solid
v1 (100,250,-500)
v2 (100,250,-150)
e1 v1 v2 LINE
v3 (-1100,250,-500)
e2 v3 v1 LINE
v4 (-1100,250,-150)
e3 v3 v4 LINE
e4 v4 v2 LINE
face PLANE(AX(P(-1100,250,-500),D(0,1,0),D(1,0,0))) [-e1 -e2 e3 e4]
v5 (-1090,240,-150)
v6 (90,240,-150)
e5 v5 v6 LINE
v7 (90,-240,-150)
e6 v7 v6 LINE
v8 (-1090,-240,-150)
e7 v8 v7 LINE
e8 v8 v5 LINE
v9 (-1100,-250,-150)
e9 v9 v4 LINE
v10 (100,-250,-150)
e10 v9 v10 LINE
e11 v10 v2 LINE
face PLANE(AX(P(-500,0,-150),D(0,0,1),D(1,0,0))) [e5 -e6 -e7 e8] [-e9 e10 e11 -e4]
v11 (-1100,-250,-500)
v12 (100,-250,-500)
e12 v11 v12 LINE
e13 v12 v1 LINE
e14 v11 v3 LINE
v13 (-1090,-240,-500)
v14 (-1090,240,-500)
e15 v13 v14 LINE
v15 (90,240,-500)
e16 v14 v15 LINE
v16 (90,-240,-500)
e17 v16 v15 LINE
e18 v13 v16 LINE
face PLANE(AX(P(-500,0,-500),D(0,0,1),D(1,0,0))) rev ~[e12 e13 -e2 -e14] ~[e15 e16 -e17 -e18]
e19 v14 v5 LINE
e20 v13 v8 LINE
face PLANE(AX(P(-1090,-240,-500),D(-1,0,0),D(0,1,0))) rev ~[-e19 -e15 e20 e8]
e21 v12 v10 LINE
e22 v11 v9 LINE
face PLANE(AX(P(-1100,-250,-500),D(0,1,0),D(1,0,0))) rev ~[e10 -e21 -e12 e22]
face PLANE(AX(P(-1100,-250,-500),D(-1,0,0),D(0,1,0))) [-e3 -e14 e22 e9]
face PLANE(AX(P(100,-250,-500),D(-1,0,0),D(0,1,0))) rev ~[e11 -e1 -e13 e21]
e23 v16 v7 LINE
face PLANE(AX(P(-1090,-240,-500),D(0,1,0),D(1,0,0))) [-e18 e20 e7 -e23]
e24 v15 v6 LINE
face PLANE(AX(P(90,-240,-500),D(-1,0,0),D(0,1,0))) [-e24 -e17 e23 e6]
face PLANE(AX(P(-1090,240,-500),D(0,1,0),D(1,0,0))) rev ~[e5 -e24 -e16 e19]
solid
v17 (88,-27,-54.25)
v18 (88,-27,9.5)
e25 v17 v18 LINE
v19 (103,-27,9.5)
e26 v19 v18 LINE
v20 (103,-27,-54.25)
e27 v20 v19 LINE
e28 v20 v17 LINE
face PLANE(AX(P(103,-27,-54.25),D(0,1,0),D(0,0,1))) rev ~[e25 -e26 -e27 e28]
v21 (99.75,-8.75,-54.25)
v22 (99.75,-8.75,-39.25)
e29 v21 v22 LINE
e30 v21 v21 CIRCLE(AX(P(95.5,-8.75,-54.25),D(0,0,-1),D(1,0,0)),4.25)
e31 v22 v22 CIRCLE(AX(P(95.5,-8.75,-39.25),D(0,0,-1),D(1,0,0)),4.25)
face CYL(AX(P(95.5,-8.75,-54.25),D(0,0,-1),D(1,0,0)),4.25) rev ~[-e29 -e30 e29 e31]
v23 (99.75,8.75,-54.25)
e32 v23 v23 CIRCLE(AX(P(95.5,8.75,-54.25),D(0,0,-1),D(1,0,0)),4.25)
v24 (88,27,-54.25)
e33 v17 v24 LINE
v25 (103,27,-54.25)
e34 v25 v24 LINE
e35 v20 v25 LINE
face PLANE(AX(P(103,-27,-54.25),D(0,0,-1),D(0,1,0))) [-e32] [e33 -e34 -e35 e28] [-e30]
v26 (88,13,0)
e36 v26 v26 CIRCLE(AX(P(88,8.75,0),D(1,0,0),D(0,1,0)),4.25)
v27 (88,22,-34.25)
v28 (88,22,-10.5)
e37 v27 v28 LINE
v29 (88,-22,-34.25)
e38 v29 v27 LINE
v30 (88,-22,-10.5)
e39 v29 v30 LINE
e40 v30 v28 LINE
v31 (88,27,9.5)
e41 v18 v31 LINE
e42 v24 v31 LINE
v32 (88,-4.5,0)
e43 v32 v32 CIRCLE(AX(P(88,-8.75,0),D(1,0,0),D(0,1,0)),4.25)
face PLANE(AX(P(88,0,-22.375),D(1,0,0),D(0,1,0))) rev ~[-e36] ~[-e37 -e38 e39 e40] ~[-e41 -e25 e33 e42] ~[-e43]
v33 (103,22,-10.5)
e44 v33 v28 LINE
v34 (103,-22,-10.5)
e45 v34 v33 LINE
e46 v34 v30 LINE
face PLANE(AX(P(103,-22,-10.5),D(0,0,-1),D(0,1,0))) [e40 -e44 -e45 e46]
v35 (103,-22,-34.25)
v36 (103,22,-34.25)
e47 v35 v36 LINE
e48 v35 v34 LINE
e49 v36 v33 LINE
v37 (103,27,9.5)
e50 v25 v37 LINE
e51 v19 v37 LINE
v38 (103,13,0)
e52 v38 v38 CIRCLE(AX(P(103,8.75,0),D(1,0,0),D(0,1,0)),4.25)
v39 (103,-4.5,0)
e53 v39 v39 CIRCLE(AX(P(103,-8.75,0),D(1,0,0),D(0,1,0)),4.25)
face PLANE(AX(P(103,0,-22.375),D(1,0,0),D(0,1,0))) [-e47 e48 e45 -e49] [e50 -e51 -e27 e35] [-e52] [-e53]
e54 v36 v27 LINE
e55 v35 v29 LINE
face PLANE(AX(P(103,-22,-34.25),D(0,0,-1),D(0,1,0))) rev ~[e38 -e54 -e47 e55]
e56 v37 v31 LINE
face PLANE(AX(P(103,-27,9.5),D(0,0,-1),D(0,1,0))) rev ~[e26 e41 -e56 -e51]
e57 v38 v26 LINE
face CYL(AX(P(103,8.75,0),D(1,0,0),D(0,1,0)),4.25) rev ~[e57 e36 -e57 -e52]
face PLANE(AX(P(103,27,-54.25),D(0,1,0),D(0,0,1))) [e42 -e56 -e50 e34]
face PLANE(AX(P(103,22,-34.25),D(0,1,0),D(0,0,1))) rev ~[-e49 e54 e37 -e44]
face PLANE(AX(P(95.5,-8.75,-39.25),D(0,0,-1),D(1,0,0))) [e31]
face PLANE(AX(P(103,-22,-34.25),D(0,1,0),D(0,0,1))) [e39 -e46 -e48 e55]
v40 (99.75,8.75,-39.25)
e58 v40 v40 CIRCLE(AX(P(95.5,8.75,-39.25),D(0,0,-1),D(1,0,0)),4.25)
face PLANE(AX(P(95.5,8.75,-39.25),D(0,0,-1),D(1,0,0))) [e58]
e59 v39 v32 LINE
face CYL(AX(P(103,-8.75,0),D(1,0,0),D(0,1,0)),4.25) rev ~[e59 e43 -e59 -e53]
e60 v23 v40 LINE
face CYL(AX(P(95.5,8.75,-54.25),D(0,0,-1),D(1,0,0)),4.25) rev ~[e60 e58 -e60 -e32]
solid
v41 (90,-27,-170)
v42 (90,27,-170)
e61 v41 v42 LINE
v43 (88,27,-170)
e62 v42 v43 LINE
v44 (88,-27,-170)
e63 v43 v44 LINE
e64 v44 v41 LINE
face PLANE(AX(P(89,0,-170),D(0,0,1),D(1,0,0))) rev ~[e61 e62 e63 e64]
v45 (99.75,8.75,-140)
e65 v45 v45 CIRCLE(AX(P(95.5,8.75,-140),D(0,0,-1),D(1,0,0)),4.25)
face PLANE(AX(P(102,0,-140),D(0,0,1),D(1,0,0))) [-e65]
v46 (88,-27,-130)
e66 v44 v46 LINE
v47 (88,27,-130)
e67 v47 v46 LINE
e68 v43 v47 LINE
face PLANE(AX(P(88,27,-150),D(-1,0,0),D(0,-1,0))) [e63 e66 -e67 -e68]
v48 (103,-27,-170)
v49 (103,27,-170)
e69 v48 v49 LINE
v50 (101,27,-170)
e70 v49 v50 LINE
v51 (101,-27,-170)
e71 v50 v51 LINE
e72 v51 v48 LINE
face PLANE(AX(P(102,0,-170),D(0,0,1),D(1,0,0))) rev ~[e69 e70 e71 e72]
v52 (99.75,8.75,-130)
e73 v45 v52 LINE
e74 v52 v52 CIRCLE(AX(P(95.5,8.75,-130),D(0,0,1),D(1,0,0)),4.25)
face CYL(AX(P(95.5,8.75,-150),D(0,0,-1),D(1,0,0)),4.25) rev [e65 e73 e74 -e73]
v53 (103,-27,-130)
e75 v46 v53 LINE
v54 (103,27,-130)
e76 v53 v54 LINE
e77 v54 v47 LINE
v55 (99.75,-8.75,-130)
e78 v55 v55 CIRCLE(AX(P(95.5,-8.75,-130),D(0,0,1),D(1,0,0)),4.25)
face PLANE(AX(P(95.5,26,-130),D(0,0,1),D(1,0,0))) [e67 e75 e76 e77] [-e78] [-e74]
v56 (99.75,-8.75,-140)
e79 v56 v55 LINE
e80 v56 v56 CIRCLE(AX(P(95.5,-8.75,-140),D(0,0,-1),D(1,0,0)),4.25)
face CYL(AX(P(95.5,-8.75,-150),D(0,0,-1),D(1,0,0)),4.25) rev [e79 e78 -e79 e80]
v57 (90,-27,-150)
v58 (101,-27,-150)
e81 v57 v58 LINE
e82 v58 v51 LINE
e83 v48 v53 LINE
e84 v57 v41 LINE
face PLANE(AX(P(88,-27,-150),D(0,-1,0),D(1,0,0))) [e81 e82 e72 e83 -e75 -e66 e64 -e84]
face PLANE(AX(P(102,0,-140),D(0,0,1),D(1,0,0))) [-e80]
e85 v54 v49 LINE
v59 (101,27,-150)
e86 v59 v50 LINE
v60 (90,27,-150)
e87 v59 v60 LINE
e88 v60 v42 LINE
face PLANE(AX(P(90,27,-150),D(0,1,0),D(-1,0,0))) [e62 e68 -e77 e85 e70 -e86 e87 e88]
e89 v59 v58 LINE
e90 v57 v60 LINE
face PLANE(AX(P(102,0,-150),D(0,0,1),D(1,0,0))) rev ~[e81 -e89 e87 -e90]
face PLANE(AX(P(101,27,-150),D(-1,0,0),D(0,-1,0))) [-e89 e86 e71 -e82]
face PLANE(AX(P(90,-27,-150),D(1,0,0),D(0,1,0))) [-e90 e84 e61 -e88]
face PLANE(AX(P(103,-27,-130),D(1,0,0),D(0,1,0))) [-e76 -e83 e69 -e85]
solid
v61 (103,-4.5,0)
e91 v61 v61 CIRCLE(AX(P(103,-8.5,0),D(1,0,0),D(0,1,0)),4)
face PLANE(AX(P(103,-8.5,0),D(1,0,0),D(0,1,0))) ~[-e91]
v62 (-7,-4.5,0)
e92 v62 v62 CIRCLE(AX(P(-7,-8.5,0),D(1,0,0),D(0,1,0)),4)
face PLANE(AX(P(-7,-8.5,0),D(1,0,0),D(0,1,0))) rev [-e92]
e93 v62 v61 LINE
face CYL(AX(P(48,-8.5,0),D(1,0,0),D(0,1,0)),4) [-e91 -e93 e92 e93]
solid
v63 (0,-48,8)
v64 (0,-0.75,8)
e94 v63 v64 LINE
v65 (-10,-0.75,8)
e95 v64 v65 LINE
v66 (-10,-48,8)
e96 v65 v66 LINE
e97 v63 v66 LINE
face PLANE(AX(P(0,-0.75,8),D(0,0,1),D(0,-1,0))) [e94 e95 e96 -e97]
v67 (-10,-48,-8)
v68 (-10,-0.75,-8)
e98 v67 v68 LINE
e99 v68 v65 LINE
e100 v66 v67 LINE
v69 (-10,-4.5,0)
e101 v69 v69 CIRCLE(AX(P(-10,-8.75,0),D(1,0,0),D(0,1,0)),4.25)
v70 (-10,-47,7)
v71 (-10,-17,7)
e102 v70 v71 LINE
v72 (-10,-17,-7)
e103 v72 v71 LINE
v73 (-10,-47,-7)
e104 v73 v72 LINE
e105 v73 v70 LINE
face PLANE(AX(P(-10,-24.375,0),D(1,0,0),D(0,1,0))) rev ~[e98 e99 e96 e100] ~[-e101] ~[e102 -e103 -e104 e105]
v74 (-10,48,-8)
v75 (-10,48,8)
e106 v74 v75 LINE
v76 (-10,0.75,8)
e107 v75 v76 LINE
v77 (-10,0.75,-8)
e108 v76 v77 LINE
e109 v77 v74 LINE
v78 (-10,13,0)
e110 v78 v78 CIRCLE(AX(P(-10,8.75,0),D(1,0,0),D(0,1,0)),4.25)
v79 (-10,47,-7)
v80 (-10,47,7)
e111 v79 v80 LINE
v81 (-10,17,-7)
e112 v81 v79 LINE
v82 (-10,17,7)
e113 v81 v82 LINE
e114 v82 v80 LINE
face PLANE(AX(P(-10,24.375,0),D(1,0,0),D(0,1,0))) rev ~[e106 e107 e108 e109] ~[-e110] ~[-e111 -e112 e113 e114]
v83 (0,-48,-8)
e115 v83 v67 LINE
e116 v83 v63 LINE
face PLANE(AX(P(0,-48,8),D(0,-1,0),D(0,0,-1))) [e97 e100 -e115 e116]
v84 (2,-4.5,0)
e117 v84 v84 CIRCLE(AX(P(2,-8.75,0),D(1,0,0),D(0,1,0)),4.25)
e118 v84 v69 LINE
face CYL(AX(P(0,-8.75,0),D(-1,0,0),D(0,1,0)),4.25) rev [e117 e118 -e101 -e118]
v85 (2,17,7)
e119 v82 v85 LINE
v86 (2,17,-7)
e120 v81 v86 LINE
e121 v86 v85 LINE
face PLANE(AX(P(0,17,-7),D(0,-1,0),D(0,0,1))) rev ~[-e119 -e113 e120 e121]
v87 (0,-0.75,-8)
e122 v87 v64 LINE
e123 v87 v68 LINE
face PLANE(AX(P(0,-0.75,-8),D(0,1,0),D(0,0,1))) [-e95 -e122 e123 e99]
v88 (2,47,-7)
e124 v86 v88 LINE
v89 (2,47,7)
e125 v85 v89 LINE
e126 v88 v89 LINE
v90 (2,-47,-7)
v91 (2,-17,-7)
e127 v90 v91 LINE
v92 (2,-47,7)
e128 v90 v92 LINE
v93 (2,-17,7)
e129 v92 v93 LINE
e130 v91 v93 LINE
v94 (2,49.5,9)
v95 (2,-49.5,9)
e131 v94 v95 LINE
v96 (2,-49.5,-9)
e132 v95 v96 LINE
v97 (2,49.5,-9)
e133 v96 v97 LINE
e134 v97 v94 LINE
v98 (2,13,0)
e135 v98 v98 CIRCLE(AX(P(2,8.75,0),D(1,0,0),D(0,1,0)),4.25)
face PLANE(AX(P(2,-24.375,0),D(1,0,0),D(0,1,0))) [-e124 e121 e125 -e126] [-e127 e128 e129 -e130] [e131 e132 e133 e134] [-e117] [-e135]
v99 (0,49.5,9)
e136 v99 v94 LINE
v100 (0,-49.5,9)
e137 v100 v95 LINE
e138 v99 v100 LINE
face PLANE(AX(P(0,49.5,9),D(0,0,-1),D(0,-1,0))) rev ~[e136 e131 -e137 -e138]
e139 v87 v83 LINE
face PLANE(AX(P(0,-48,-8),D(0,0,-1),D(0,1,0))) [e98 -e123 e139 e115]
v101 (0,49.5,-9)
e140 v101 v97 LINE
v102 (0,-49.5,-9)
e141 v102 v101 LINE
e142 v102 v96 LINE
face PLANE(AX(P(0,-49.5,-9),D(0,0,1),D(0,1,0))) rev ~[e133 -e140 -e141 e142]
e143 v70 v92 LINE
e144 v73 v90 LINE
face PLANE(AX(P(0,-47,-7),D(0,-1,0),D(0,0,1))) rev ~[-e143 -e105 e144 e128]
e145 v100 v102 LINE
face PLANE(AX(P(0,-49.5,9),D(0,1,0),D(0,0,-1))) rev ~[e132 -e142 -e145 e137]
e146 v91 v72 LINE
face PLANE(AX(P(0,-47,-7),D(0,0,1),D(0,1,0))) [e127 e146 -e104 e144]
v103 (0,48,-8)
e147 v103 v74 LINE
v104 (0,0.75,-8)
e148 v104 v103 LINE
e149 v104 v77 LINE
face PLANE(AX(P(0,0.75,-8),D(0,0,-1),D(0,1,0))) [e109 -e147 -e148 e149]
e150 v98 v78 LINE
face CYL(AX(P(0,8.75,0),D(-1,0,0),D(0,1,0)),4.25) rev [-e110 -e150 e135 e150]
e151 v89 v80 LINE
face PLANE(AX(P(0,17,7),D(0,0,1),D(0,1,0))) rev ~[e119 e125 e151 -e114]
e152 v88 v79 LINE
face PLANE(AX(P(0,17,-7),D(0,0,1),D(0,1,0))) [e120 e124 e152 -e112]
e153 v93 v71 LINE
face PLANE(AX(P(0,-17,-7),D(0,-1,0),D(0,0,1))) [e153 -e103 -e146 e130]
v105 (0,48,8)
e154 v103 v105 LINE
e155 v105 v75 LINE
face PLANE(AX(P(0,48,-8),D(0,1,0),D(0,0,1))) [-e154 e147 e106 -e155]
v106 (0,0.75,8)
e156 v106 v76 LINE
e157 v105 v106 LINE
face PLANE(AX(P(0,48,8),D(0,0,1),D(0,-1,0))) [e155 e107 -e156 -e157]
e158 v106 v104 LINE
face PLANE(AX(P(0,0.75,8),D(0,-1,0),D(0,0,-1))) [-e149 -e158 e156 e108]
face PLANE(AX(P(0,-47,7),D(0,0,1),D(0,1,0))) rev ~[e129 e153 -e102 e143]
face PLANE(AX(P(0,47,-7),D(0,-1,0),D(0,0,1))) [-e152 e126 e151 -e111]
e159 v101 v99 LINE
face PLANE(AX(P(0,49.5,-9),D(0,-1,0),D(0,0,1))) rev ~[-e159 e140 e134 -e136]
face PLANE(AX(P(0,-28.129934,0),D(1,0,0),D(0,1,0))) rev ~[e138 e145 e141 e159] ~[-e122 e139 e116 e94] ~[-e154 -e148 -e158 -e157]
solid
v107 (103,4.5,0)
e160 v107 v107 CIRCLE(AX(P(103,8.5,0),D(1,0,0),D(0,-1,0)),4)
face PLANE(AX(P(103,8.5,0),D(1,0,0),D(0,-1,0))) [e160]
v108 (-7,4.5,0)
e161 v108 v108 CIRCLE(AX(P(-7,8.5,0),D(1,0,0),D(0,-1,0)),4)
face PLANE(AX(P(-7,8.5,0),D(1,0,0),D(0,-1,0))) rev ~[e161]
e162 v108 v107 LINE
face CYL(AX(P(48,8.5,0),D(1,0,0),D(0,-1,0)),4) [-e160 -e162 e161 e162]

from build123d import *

# Parameters (mm, degrees)
F0_W          = 1.5
F0_H          = 1
F0_H_2        = 16
F0_R          = 4.25
F0_W_2        = 30
F0_H_3        = 14
F1_DEPTH      = 2
F2_DEPTH      = 10
F2_DEPTH_BACK = 2
F5_W          = 1200
F5_H          = 500
F5_W_2        = 1180
F5_H_2        = 480
F6_DEPTH      = 350
F8_W          = 10
F8_H          = 2
F8_W_2        = 1
F8_H_2        = 50
F8_R          = 4.25
F9_DEPTH      = 10
F8_W_3        = 11
F10_DEPTH     = 20
F12_DEPTH     = 15
F13_DEPTH     = 20
F14_W         = 54
F14_H         = 63.75
F14_R         = 4.25
F14_W_2       = 44
F14_H_2       = 23.75
F15_DEPTH     = 15
F16_W         = 110
F16_H         = 4
F19_R         = 4.25
F20_DEPTH     = 15


# Not quite as in the source:
# - a feature names something its author has since deleted; it is built from what else it names
# - the program builds the solid bodies; features that only make, move or delete a surface that nothing else refers to are left out


with BuildPart() as f1:
    # F0 (on Right) → F1 (new body)
    with BuildSketch(Plane.YZ):
        Polygon((-0.75, 9), (-49.5, 9), (-49.5, -9), (-0.75, -9), (-0.75, -8), (-13, -8), (-16, -8), (-48, -8), (-48, 8), (-16, 8), (-13, 8), (-0.75, 8), align=None)
        with Locations((0, 8.5)):
            Rectangle(F0_W, F0_H)
        Polygon((49.5, 9), (0.75, 9), (0.75, 8), (13, 8), (16, 8), (48, 8), (48, -8), (16, -8), (13, -8), (0.75, -8), (0.75, -9), (49.5, -9), align=None)
        with Locations((0, -8.5)):
            Rectangle(F0_W, F0_H)
        Rectangle(F0_W, F0_H_2)
        Polygon((13, 8), (0.75, 8), (0.75, -8), (13, -8), (16, -8), (48, -8), (48, 8), (16, 8), align=None)
        with Locations((8.75, 0)):
            Circle(F0_R, mode=Mode.SUBTRACT)
        with Locations((32, 0)):
            Rectangle(F0_W_2, F0_H_3, mode=Mode.SUBTRACT)
    extrude(amount=F1_DEPTH)

    # F0 (on Right) → F2 (join, two sides)
    with BuildSketch(Plane.YZ) as f2_sk:
        Polygon((-0.75, -8), (-0.75, 8), (-13, 8), (-16, 8), (-48, 8), (-48, -8), (-16, -8), (-13, -8), align=None)
        with Locations((-32, 0)):
            Rectangle(F0_W_2, F0_H_3, mode=Mode.SUBTRACT)
        with Locations((-8.75, 0)):
            Circle(F0_R, mode=Mode.SUBTRACT)
        Polygon((13, 8), (0.75, 8), (0.75, -8), (13, -8), (16, -8), (48, -8), (48, 8), (16, 8), align=None)
        with Locations((8.75, 0)):
            Circle(F0_R, mode=Mode.SUBTRACT)
        with Locations((32, 0)):
            Rectangle(F0_W_2, F0_H_3, mode=Mode.SUBTRACT)
    extrude(amount=-F2_DEPTH)
    extrude(f2_sk.sketch, amount=F2_DEPTH_BACK)


with BuildPart() as f6:
    # F5 (on offset) → F6 (new body)
    with BuildSketch(Plane.XY.offset(-500)):
        with Locations((-500, 0)):
            Rectangle(F5_W, F5_H)
        with Locations((-500, 0)):
            Rectangle(F5_W_2, F5_H_2, mode=Mode.SUBTRACT)
    extrude(amount=F6_DEPTH)


with BuildPart() as f9:
    # F8 (on face) → F9 (new body)
    with BuildSketch(Plane.XY.offset(-150)):
        Polygon((101, 27), (101, 25), (101, -25), (101, -27), (103, -27), (103, 27), align=None)
        Polygon((90, -25), (90, 25), (90, 27), (88, 27), (88, -27), (90, -27), align=None)
        with Locations((95, 26)):
            Rectangle(F8_W, F8_H)
        with Locations((100.5, 26)):
            Rectangle(F8_W_2, F8_H)
        with Locations((100.5, -26)):
            Rectangle(F8_W_2, F8_H)
        with Locations((95, -26)):
            Rectangle(F8_W, F8_H)
        with Locations((100.5, 0)):
            Rectangle(F8_W_2, F8_H_2)
        with Locations((95, 0)):
            Rectangle(F8_W, F8_H_2)
        with Locations((95.5, -8.75)):
            Circle(F8_R, mode=Mode.SUBTRACT)
        with Locations((95.5, 8.75)):
            Circle(F8_R, mode=Mode.SUBTRACT)
        with Locations((95.5, 8.75)):
            Circle(F8_R)
        with Locations((95.5, -8.75)):
            Circle(F8_R)
    extrude(amount=F9_DEPTH)

    # F8 (on face) → F10 (join)
    with BuildSketch(Plane.XY.offset(-150)):
        with Locations((95.5, 26)):
            Rectangle(F8_W_3, F8_H)
        Polygon((90, -25), (90, 25), (90, 27), (88, 27), (88, -27), (90, -27), align=None)
        Polygon((101, 27), (101, 25), (101, -25), (101, -27), (103, -27), (103, 27), align=None)
        with Locations((95.5, -26)):
            Rectangle(F8_W_3, F8_H)
        with Locations((95, 0)):
            Rectangle(F8_W, F8_H_2)
        with Locations((95.5, -8.75)):
            Circle(F8_R, mode=Mode.SUBTRACT)
        with Locations((95.5, 8.75)):
            Circle(F8_R, mode=Mode.SUBTRACT)
        with Locations((100.5, 0)):
            Rectangle(F8_W_2, F8_H_2)
    extrude(amount=F10_DEPTH)

    # F12 (add): a face of the model
    f12_faces = [f9.faces().sort_by_distance(p)[0] for p in [
        (95.5, 0, -130),
    ]]
    extrude(f12_faces, amount=-F12_DEPTH)

    # F8 (on face) → F13 (join)
    with BuildSketch(Plane.XY.offset(-150)):
        Polygon((90, -25), (90, 25), (90, 27), (88, 27), (88, -27), (90, -27), align=None)
        Polygon((101, 27), (101, 25), (101, -25), (101, -27), (103, -27), (103, 27), align=None)
    extrude(amount=-F13_DEPTH)


with BuildPart() as f15:
    # F14 (on face) → F15 (new body)
    with BuildSketch(Plane.YZ.offset(103)):
        with Locations((0, -22.375)):
            Rectangle(F14_W, F14_H)
        with Locations((-8.75, 0)):
            Circle(F14_R, mode=Mode.SUBTRACT)
        with Locations((0, -22.375)):
            Rectangle(F14_W_2, F14_H_2, mode=Mode.SUBTRACT)
        with Locations((8.75, 0)):
            Circle(F14_R, mode=Mode.SUBTRACT)
    extrude(amount=-F15_DEPTH)

    # F19 (on face) → F20 (cut)
    with BuildSketch(Plane(origin=(0, 0, -54.25), x_dir=(1, 0, 0), z_dir=(0, 0, -1))):
        with Locations((95.5, 8.75)):
            Circle(F19_R)
        with Locations((95.5, -8.75)):
            Circle(F19_R)
    extrude(amount=-F20_DEPTH, mode=Mode.SUBTRACT)


with BuildPart() as f17:
    # F16 (on Top) → F17 (revolve)
    with BuildSketch(Plane.XY):
        with Locations((48, -6.5)):
            Rectangle(F16_W, F16_H)
    revolve(axis=Axis((48, -8.5, 0), (1, 0, 0)))


with BuildPart() as f18:
    # F16 (on Top) → F18 (revolve)
    with BuildSketch(Plane.XY):
        with Locations((48, 6.5)):
            Rectangle(F16_W, F16_H)
    revolve(axis=Axis((48, 8.5, 0), (1, 0, 0)))


solid = Compound([f1.part, f6.part, f9.part, f15.part, f17.part, f18.part])
